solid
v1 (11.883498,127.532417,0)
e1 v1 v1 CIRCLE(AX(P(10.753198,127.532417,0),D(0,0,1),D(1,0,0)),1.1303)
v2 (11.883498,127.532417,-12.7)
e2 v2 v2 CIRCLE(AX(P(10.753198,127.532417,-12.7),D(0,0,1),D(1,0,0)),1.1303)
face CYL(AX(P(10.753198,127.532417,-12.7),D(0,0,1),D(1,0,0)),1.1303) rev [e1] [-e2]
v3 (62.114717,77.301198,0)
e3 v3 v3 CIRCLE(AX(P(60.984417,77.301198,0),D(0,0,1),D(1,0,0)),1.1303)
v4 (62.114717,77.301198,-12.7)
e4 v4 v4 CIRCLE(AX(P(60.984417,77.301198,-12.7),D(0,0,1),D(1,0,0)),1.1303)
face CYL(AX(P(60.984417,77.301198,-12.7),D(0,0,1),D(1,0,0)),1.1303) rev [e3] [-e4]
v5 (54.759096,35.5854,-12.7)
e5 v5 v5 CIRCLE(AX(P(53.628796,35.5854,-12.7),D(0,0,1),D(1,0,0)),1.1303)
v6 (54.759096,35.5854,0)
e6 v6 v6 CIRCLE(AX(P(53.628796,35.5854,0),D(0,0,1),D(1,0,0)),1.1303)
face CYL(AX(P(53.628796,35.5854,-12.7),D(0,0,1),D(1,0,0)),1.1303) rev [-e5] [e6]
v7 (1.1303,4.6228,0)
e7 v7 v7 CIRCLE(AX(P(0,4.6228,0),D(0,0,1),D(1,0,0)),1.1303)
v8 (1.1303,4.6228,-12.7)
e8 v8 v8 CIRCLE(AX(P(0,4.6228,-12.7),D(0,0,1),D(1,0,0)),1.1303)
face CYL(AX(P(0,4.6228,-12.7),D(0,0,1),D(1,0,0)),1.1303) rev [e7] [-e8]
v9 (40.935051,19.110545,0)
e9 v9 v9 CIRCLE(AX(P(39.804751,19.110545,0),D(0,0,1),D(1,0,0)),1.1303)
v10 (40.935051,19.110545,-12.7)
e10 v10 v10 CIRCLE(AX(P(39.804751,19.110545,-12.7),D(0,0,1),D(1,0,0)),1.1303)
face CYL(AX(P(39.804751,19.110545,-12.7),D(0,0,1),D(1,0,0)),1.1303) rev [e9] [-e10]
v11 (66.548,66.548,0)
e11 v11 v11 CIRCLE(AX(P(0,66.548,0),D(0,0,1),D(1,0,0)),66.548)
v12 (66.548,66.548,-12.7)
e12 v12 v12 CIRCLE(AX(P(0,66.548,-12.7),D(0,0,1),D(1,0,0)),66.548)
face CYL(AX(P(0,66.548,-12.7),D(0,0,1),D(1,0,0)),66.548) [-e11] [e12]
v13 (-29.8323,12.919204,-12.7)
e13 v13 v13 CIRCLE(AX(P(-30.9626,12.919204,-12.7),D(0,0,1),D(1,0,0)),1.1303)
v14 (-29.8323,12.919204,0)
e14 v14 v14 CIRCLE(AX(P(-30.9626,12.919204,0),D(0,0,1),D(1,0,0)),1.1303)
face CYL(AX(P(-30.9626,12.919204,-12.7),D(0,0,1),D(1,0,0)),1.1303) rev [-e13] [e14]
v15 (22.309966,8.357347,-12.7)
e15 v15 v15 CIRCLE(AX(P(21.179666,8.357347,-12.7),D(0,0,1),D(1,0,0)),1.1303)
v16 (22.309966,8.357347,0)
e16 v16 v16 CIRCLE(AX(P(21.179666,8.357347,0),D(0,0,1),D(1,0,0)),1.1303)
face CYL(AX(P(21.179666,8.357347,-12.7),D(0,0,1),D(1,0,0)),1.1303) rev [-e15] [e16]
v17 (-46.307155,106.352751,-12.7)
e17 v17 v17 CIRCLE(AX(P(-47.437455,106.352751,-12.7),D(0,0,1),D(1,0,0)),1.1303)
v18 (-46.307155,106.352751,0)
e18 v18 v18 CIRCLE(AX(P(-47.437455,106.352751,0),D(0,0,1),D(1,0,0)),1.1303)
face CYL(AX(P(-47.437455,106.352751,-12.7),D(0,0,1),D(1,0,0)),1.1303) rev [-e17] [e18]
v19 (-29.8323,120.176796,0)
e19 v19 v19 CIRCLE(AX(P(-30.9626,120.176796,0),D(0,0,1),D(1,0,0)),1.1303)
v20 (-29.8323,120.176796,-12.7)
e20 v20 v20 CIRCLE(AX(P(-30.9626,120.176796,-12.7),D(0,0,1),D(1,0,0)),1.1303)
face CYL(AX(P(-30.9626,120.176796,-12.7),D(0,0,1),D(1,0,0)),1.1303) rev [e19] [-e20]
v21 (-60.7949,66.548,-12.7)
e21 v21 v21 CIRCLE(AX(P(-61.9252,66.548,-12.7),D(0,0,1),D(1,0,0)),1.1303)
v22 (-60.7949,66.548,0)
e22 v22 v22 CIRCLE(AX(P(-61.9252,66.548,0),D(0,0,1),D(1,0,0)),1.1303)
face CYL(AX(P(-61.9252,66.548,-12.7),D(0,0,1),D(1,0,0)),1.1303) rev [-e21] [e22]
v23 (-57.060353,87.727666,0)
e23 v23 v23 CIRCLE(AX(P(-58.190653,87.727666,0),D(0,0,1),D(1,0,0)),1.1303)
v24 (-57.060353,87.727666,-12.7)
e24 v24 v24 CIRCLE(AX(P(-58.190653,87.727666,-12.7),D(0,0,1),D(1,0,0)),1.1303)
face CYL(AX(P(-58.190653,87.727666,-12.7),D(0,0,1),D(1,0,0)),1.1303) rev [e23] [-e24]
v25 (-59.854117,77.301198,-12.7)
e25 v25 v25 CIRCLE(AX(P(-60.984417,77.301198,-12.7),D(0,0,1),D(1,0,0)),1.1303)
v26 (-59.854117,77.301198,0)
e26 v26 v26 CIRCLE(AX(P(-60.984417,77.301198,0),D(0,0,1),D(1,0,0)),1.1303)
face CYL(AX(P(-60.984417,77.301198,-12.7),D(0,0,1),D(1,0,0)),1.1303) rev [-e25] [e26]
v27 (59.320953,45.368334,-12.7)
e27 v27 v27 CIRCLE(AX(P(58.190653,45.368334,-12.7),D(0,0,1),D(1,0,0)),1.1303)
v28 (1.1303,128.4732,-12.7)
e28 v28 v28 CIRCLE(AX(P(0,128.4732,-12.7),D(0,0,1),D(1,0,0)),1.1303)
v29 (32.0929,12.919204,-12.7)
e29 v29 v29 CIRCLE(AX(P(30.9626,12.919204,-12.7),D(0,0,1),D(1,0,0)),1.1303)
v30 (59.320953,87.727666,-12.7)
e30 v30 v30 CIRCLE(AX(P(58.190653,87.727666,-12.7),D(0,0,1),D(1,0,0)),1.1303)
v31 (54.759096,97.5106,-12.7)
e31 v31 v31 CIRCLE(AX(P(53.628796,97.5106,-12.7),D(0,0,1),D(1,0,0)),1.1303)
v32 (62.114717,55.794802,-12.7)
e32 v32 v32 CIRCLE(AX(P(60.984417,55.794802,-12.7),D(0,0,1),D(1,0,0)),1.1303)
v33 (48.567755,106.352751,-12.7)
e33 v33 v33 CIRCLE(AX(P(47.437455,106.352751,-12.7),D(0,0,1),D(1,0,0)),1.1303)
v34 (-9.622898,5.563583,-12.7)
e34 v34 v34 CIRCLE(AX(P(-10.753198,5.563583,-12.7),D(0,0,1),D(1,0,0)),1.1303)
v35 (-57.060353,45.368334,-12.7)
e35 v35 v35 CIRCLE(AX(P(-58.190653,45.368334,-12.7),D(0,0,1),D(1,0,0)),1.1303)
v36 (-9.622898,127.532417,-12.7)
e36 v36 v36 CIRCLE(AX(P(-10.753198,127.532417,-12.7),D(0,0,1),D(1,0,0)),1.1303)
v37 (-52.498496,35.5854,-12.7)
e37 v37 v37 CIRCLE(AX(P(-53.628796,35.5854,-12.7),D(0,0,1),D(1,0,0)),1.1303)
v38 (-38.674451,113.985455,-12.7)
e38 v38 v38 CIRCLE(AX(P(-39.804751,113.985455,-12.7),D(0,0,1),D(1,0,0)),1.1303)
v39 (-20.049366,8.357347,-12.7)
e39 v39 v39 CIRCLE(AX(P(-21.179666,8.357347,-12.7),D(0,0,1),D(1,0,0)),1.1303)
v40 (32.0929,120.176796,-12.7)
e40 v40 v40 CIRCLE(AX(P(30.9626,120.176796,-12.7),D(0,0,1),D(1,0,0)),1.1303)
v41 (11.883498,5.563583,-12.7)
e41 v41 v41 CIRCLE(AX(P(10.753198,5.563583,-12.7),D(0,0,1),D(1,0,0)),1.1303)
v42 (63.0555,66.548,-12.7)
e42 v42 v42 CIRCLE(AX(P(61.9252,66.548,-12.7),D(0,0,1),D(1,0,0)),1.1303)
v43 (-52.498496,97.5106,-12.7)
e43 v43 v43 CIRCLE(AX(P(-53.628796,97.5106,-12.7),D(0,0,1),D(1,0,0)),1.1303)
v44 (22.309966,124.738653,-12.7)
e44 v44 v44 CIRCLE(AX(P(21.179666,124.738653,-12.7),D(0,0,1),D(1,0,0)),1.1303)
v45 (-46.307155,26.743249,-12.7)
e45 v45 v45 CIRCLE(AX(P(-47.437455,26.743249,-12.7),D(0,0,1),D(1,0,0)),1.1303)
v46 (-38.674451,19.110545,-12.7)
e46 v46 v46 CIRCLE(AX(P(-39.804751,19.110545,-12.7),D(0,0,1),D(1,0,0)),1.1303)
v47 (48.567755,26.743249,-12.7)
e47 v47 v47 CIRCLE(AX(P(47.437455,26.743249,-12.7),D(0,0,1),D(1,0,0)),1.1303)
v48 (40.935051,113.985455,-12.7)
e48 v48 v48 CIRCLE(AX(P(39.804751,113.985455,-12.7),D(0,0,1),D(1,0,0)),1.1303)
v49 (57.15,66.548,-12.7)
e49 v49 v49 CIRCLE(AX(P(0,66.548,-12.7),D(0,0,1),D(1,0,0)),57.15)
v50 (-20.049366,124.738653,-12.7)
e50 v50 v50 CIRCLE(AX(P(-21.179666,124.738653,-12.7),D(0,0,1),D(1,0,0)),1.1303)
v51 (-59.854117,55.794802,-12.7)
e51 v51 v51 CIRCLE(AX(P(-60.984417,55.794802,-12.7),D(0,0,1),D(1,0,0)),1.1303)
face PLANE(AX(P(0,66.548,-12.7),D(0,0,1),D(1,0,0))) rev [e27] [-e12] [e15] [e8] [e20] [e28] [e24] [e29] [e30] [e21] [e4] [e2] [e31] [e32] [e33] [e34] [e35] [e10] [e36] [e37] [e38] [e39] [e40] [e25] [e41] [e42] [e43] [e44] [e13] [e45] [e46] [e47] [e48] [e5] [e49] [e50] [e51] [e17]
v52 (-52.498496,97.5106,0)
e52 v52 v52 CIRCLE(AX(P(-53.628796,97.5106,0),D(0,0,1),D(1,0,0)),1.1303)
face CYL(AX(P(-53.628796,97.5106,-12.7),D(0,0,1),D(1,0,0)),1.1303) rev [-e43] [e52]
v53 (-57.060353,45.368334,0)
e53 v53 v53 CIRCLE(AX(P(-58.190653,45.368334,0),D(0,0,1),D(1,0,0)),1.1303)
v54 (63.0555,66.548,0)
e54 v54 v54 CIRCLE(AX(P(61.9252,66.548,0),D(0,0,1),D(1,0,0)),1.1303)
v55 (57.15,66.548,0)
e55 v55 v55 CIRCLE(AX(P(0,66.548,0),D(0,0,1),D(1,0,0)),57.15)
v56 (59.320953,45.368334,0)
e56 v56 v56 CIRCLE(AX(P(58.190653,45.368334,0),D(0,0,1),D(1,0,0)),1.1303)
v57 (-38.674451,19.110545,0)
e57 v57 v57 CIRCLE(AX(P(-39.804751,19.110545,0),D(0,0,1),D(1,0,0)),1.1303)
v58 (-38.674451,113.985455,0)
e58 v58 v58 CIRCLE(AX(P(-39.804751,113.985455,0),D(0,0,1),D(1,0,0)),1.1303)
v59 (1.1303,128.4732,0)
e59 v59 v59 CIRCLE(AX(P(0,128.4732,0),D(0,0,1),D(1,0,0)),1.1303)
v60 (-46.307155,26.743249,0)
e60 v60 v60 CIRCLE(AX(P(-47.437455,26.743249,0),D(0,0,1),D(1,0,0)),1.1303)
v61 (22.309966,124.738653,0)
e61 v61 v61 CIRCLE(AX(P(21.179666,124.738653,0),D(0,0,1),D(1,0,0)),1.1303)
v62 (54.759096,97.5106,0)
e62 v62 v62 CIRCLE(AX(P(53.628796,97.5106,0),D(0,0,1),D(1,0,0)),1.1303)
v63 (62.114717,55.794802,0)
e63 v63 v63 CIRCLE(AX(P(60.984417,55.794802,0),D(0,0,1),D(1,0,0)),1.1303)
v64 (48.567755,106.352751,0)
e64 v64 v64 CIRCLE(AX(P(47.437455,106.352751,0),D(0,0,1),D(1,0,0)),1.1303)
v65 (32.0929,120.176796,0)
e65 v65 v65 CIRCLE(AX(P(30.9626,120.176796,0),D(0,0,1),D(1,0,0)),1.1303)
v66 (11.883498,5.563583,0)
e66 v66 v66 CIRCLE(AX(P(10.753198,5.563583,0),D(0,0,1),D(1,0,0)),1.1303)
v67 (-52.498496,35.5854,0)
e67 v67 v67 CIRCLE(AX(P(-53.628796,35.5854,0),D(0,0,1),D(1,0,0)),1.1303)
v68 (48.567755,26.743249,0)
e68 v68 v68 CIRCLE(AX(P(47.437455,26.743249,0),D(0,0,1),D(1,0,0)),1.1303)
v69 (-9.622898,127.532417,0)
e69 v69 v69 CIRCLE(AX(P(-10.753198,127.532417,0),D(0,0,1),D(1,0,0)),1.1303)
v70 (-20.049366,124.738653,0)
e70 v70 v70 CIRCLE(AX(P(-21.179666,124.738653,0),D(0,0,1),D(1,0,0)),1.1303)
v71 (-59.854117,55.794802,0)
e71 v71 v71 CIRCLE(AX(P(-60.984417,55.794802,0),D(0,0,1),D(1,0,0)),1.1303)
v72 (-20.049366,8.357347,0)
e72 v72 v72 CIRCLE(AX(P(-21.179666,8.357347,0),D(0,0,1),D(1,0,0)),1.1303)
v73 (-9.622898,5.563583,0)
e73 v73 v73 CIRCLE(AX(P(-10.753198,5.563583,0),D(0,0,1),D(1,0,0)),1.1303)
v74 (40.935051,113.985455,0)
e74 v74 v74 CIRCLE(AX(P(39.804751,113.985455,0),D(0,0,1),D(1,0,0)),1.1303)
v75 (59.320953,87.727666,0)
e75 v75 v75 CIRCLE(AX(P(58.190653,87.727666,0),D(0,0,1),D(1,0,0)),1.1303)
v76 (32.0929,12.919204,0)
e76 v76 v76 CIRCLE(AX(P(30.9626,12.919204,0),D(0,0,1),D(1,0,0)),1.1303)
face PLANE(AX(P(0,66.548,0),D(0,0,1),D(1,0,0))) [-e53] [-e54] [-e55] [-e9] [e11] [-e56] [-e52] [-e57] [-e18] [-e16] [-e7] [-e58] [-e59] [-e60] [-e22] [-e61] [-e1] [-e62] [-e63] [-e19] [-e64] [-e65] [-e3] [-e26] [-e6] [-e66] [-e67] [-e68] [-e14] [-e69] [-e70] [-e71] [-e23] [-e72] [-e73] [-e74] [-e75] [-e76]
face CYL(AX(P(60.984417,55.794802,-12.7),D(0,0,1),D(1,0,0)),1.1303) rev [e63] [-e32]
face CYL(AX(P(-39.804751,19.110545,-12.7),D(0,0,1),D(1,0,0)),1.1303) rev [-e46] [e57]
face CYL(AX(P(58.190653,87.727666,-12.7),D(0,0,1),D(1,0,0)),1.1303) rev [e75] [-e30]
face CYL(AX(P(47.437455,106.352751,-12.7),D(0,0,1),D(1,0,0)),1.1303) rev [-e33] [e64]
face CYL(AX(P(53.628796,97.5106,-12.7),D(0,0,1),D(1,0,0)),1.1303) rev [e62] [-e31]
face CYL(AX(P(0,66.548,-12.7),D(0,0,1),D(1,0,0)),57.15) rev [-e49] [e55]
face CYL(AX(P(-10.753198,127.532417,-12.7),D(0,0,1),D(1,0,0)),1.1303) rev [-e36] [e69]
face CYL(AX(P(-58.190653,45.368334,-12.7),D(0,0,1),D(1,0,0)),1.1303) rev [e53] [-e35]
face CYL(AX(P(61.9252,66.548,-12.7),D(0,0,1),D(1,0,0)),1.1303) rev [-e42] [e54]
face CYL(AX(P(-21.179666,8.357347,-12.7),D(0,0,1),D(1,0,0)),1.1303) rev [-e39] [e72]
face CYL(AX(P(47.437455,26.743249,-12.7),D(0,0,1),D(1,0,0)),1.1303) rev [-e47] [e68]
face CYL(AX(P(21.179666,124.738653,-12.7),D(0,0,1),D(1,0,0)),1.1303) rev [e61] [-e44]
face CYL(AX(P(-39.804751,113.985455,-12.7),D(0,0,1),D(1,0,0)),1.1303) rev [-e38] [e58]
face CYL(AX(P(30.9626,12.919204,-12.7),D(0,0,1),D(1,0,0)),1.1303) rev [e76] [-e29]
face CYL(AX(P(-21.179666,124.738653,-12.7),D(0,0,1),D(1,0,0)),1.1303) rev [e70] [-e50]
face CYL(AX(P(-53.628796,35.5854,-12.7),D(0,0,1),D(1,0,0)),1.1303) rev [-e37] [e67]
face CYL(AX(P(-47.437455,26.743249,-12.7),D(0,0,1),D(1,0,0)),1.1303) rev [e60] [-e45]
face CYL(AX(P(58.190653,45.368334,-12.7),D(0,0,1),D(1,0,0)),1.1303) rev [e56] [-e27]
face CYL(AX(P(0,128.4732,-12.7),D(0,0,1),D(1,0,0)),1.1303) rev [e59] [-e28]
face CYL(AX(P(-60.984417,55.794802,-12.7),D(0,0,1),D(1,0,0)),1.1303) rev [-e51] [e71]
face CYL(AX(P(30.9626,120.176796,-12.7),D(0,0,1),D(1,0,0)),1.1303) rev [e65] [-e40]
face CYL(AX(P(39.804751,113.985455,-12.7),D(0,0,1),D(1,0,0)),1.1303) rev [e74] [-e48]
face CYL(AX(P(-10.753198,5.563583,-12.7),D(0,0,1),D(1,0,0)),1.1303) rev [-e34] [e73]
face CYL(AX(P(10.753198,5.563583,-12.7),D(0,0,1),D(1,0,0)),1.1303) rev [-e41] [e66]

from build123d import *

# Parameters (mm, degrees)
SKETCH1_R                   = 66.548
SKETCH1_R_2                 = 57.15
SKETCH1_R_3                 = 1.1303
BOSS_EXTRUDE1_DEPTH         = 12.7
BODY_MOVE_COPY1_START       = -12.7
BODY_MOVE_COPY1_OUTLINE_R   = 1.1303
BODY_MOVE_COPY1_DEPTH       = 12.7
BODY_MOVE_COPY1_2_OUTLINE_R = 1.1303
BODY_MOVE_COPY1_2_DEPTH     = 12.7


# Read off the part's stored shape, not the designer's step: Body-Move/Copy1
with BuildPart() as part:
    # Sketch1 → Boss-Extrude1 (new body)
    with BuildSketch(Plane.XY):
        Circle(SKETCH1_R)
        Circle(SKETCH1_R_2, mode=Mode.SUBTRACT)
        with Locations((0, 61.9252)):
            Circle(SKETCH1_R_3, mode=Mode.SUBTRACT)
        with Locations((10.753198132, 60.984417067)):
            Circle(SKETCH1_R_3, mode=Mode.SUBTRACT)
        with Locations((21.179665779, 58.190653481)):
            Circle(SKETCH1_R_3, mode=Mode.SUBTRACT)
        with Locations((30.9626, 53.628796334)):
            Circle(SKETCH1_R_3, mode=Mode.SUBTRACT)
        with Locations((39.804751287, 47.437455349)):
            Circle(SKETCH1_R_3, mode=Mode.SUBTRACT)
        with Locations((47.437455349, 39.804751287)):
            Circle(SKETCH1_R_3, mode=Mode.SUBTRACT)
        with Locations((53.628796334, 30.9626)):
            Circle(SKETCH1_R_3, mode=Mode.SUBTRACT)
        with Locations((58.190653481, 21.179665779)):
            Circle(SKETCH1_R_3, mode=Mode.SUBTRACT)
        with Locations((60.984417067, 10.753198132)):
            Circle(SKETCH1_R_3, mode=Mode.SUBTRACT)
        with Locations((61.9252, 0)):
            Circle(SKETCH1_R_3, mode=Mode.SUBTRACT)
        with Locations((60.984417067, -10.753198132)):
            Circle(SKETCH1_R_3, mode=Mode.SUBTRACT)
        with Locations((58.190653481, -21.179665779)):
            Circle(SKETCH1_R_3, mode=Mode.SUBTRACT)
        with Locations((53.628796334, -30.9626)):
            Circle(SKETCH1_R_3, mode=Mode.SUBTRACT)
        with Locations((47.437455349, -39.804751287)):
            Circle(SKETCH1_R_3, mode=Mode.SUBTRACT)
        with Locations((39.804751287, -47.437455349)):
            Circle(SKETCH1_R_3, mode=Mode.SUBTRACT)
        with Locations((30.9626, -53.628796334)):
            Circle(SKETCH1_R_3, mode=Mode.SUBTRACT)
        with Locations((21.179665779, -58.190653481)):
            Circle(SKETCH1_R_3, mode=Mode.SUBTRACT)
        with Locations((10.753198132, -60.984417067)):
            Circle(SKETCH1_R_3, mode=Mode.SUBTRACT)
        with Locations((0, -61.9252)):
            Circle(SKETCH1_R_3, mode=Mode.SUBTRACT)
        with Locations((-10.753198132, -60.984417067)):
            Circle(SKETCH1_R_3, mode=Mode.SUBTRACT)
        with Locations((-21.179665779, -58.190653481)):
            Circle(SKETCH1_R_3, mode=Mode.SUBTRACT)
        with Locations((-30.9626, -53.628796334)):
            Circle(SKETCH1_R_3, mode=Mode.SUBTRACT)
        with Locations((-39.804751287, -47.437455349)):
            Circle(SKETCH1_R_3, mode=Mode.SUBTRACT)
        with Locations((-47.437455349, -39.804751287)):
            Circle(SKETCH1_R_3, mode=Mode.SUBTRACT)
        with Locations((-53.628796334, -30.9626)):
            Circle(SKETCH1_R_3, mode=Mode.SUBTRACT)
        with Locations((-58.190653481, -21.179665779)):
            Circle(SKETCH1_R_3, mode=Mode.SUBTRACT)
        with Locations((-60.984417067, -10.753198132)):
            Circle(SKETCH1_R_3, mode=Mode.SUBTRACT)
        with Locations((-61.9252, 0)):
            Circle(SKETCH1_R_3, mode=Mode.SUBTRACT)
        with Locations((-60.984417067, 10.753198132)):
            Circle(SKETCH1_R_3, mode=Mode.SUBTRACT)
        with Locations((-58.190653481, 21.179665779)):
            Circle(SKETCH1_R_3, mode=Mode.SUBTRACT)
        with Locations((-53.628796334, 30.9626)):
            Circle(SKETCH1_R_3, mode=Mode.SUBTRACT)
        with Locations((-47.437455349, 39.804751287)):
            Circle(SKETCH1_R_3, mode=Mode.SUBTRACT)
        with Locations((-39.804751287, 47.437455349)):
            Circle(SKETCH1_R_3, mode=Mode.SUBTRACT)
        with Locations((-30.9626, 53.628796334)):
            Circle(SKETCH1_R_3, mode=Mode.SUBTRACT)
        with Locations((-21.179665779, 58.190653481)):
            Circle(SKETCH1_R_3, mode=Mode.SUBTRACT)
        with Locations((-10.753198132, 60.984417067)):
            Circle(SKETCH1_R_3, mode=Mode.SUBTRACT)
    extrude(amount=-BOSS_EXTRUDE1_DEPTH)

    # Body-Move/Copy1 outline → Body-Move/Copy1 (cut)
    # profile 1 of 4: a face of its own
    with BuildSketch(Plane.XY.offset(BODY_MOVE_COPY1_START)):
        with BuildLine():
            ThreePointArc((-51.613279002, 24.539599237), (-54.79707391, 28.786683882), (-57.632258571, 33.274))
            ThreePointArc((-57.632258571, 33.274), (0, -66.548), (57.632258571, 33.274))
            ThreePointArc((57.632258571, 33.274), (54.79707391, 28.786683882), (51.613279002, 24.539599237))
            ThreePointArc((51.613279002, 24.539599237), (0, -57.15), (-51.613279002, 24.539599237))
        make_face()
        with Locations((-39.804751287, -47.437455349)):
            Circle(BODY_MOVE_COPY1_OUTLINE_R, mode=Mode.SUBTRACT)
        with Locations((-53.628796334, -30.9626)):
            Circle(BODY_MOVE_COPY1_OUTLINE_R, mode=Mode.SUBTRACT)
        with Locations((-58.190653481, -21.179665779)):
            Circle(BODY_MOVE_COPY1_OUTLINE_R, mode=Mode.SUBTRACT)
        with Locations((-47.437455349, -39.804751287)):
            Circle(BODY_MOVE_COPY1_OUTLINE_R, mode=Mode.SUBTRACT)
        with Locations((-21.179665779, -58.190653481)):
            Circle(BODY_MOVE_COPY1_OUTLINE_R, mode=Mode.SUBTRACT)
        with Locations((-30.9626, -53.628796334)):
            Circle(BODY_MOVE_COPY1_OUTLINE_R, mode=Mode.SUBTRACT)
        with Locations((-10.753198132, -60.984417067)):
            Circle(BODY_MOVE_COPY1_OUTLINE_R, mode=Mode.SUBTRACT)
        with Locations((-60.984417067, -10.753198132)):
            Circle(BODY_MOVE_COPY1_OUTLINE_R, mode=Mode.SUBTRACT)
        with Locations((-61.9252, 0)):
            Circle(BODY_MOVE_COPY1_OUTLINE_R, mode=Mode.SUBTRACT)
        with Locations((-60.984417067, 10.753198132)):
            Circle(BODY_MOVE_COPY1_OUTLINE_R, mode=Mode.SUBTRACT)
        with Locations((-58.190653481, 21.179665779)):
            Circle(BODY_MOVE_COPY1_OUTLINE_R, mode=Mode.SUBTRACT)
        with Locations((0, -61.9252)):
            Circle(BODY_MOVE_COPY1_OUTLINE_R, mode=Mode.SUBTRACT)
        with Locations((10.753198132, -60.984417067)):
            Circle(BODY_MOVE_COPY1_OUTLINE_R, mode=Mode.SUBTRACT)
        with Locations((21.179665779, -58.190653481)):
            Circle(BODY_MOVE_COPY1_OUTLINE_R, mode=Mode.SUBTRACT)
        with Locations((30.9626, -53.628796334)):
            Circle(BODY_MOVE_COPY1_OUTLINE_R, mode=Mode.SUBTRACT)
        with Locations((39.804751287, -47.437455349)):
            Circle(BODY_MOVE_COPY1_OUTLINE_R, mode=Mode.SUBTRACT)
        with Locations((47.437455349, -39.804751287)):
            Circle(BODY_MOVE_COPY1_OUTLINE_R, mode=Mode.SUBTRACT)
        with Locations((53.628796334, -30.9626)):
            Circle(BODY_MOVE_COPY1_OUTLINE_R, mode=Mode.SUBTRACT)
        with Locations((58.190653481, -21.179665779)):
            Circle(BODY_MOVE_COPY1_OUTLINE_R, mode=Mode.SUBTRACT)
        with Locations((60.984417067, -10.753198132)):
            Circle(BODY_MOVE_COPY1_OUTLINE_R, mode=Mode.SUBTRACT)
        with Locations((61.9252, 0)):
            Circle(BODY_MOVE_COPY1_OUTLINE_R, mode=Mode.SUBTRACT)
        with Locations((60.984417067, 10.753198132)):
            Circle(BODY_MOVE_COPY1_OUTLINE_R, mode=Mode.SUBTRACT)
        with Locations((58.190653481, 21.179665779)):
            Circle(BODY_MOVE_COPY1_OUTLINE_R, mode=Mode.SUBTRACT)
    # profile 2 of 4: a face of its own
    with BuildSketch(Plane.XY.offset(BODY_MOVE_COPY1_START)):
        with BuildLine():
            ThreePointArc((51.613279002, 42.008400763), (0, 66.548), (-51.613279002, 42.008400763))
            ThreePointArc((-51.613279002, 42.008400763), (-49.23304107, 37.526797975), (-46.464647034, 33.274))
            ThreePointArc((-46.464647034, 33.274), (0, 57.15), (46.464647034, 33.274))
            ThreePointArc((46.464647034, 33.274), (49.23304107, 37.526797975), (51.613279002, 42.008400763))
        make_face()
        with Locations((-47.437455349, 39.804751287)):
            Circle(BODY_MOVE_COPY1_OUTLINE_R, mode=Mode.SUBTRACT)
        with Locations((-39.804751287, 47.437455349)):
            Circle(BODY_MOVE_COPY1_OUTLINE_R, mode=Mode.SUBTRACT)
        with Locations((-30.9626, 53.628796334)):
            Circle(BODY_MOVE_COPY1_OUTLINE_R, mode=Mode.SUBTRACT)
        with Locations((-21.179665779, 58.190653481)):
            Circle(BODY_MOVE_COPY1_OUTLINE_R, mode=Mode.SUBTRACT)
        with Locations((-10.753198132, 60.984417067)):
            Circle(BODY_MOVE_COPY1_OUTLINE_R, mode=Mode.SUBTRACT)
        with Locations((21.179665779, 58.190653481)):
            Circle(BODY_MOVE_COPY1_OUTLINE_R, mode=Mode.SUBTRACT)
        with Locations((30.9626, 53.628796334)):
            Circle(BODY_MOVE_COPY1_OUTLINE_R, mode=Mode.SUBTRACT)
        with Locations((0, 61.9252)):
            Circle(BODY_MOVE_COPY1_OUTLINE_R, mode=Mode.SUBTRACT)
        with Locations((10.753198132, 60.984417067)):
            Circle(BODY_MOVE_COPY1_OUTLINE_R, mode=Mode.SUBTRACT)
        with Locations((47.437455349, 39.804751287)):
            Circle(BODY_MOVE_COPY1_OUTLINE_R, mode=Mode.SUBTRACT)
        with Locations((39.804751287, 47.437455349)):
            Circle(BODY_MOVE_COPY1_OUTLINE_R, mode=Mode.SUBTRACT)
    # profile 3 of 4: a face of its own
    with BuildSketch(Plane.XY.offset(BODY_MOVE_COPY1_START)):
        with Locations((53.628796334, 35.5854)):
            Circle(BODY_MOVE_COPY1_OUTLINE_R)
    # profile 4 of 4: a face of its own
    with BuildSketch(Plane.XY.offset(BODY_MOVE_COPY1_START)):
        with Locations((-53.628796334, 35.5854)):
            Circle(BODY_MOVE_COPY1_OUTLINE_R)
    extrude(amount=BODY_MOVE_COPY1_DEPTH, mode=Mode.SUBTRACT)

    # Body-Move_Copy1 2 outline → Body-Move_Copy1 2 (add)
    # profile 1 of 4: a face of its own
    with BuildSketch(Plane.XY.offset(BODY_MOVE_COPY1_START)):
        with BuildLine():
            ThreePointArc((57.632258571, 33.274), (0, 133.096), (-57.632258571, 33.274))
            ThreePointArc((-57.632258571, 33.274), (-54.79707391, 37.761316118), (-51.613279002, 42.008400763))
            ThreePointArc((-51.613279002, 42.008400763), (0, 123.698), (51.613279002, 42.008400763))
            ThreePointArc((51.613279002, 42.008400763), (54.79707391, 37.761316118), (57.632258571, 33.274))
        make_face()
        with Locations((-58.190653481, 45.368334221)):
            Circle(BODY_MOVE_COPY1_2_OUTLINE_R, mode=Mode.SUBTRACT)
        with Locations((-60.984417067, 55.794801868)):
            Circle(BODY_MOVE_COPY1_2_OUTLINE_R, mode=Mode.SUBTRACT)
        with Locations((-61.9252, 66.548)):
            Circle(BODY_MOVE_COPY1_2_OUTLINE_R, mode=Mode.SUBTRACT)
        with Locations((-60.984417067, 77.301198132)):
            Circle(BODY_MOVE_COPY1_2_OUTLINE_R, mode=Mode.SUBTRACT)
        with Locations((-58.190653481, 87.727665779)):
            Circle(BODY_MOVE_COPY1_2_OUTLINE_R, mode=Mode.SUBTRACT)
        with Locations((-53.628796334, 97.5106)):
            Circle(BODY_MOVE_COPY1_2_OUTLINE_R, mode=Mode.SUBTRACT)
        with Locations((-47.437455349, 106.352751287)):
            Circle(BODY_MOVE_COPY1_2_OUTLINE_R, mode=Mode.SUBTRACT)
        with Locations((-39.804751287, 113.985455349)):
            Circle(BODY_MOVE_COPY1_2_OUTLINE_R, mode=Mode.SUBTRACT)
        with Locations((-30.9626, 120.176796334)):
            Circle(BODY_MOVE_COPY1_2_OUTLINE_R, mode=Mode.SUBTRACT)
        with Locations((-21.179665779, 124.738653481)):
            Circle(BODY_MOVE_COPY1_2_OUTLINE_R, mode=Mode.SUBTRACT)
        with Locations((-10.753198132, 127.532417067)):
            Circle(BODY_MOVE_COPY1_2_OUTLINE_R, mode=Mode.SUBTRACT)
        with Locations((58.190653481, 45.368334221)):
            Circle(BODY_MOVE_COPY1_2_OUTLINE_R, mode=Mode.SUBTRACT)
        with Locations((60.984417067, 55.794801868)):
            Circle(BODY_MOVE_COPY1_2_OUTLINE_R, mode=Mode.SUBTRACT)
        with Locations((61.9252, 66.548)):
            Circle(BODY_MOVE_COPY1_2_OUTLINE_R, mode=Mode.SUBTRACT)
        with Locations((60.984417067, 77.301198132)):
            Circle(BODY_MOVE_COPY1_2_OUTLINE_R, mode=Mode.SUBTRACT)
        with Locations((0, 128.4732)):
            Circle(BODY_MOVE_COPY1_2_OUTLINE_R, mode=Mode.SUBTRACT)
        with Locations((10.753198132, 127.532417067)):
            Circle(BODY_MOVE_COPY1_2_OUTLINE_R, mode=Mode.SUBTRACT)
        with Locations((30.9626, 120.176796334)):
            Circle(BODY_MOVE_COPY1_2_OUTLINE_R, mode=Mode.SUBTRACT)
        with Locations((21.179665779, 124.738653481)):
            Circle(BODY_MOVE_COPY1_2_OUTLINE_R, mode=Mode.SUBTRACT)
        with Locations((47.437455349, 106.352751287)):
            Circle(BODY_MOVE_COPY1_2_OUTLINE_R, mode=Mode.SUBTRACT)
        with Locations((58.190653481, 87.727665779)):
            Circle(BODY_MOVE_COPY1_2_OUTLINE_R, mode=Mode.SUBTRACT)
        with Locations((53.628796334, 97.5106)):
            Circle(BODY_MOVE_COPY1_2_OUTLINE_R, mode=Mode.SUBTRACT)
        with Locations((39.804751287, 113.985455349)):
            Circle(BODY_MOVE_COPY1_2_OUTLINE_R, mode=Mode.SUBTRACT)
    # profile 2 of 4: a face of its own
    with BuildSketch(Plane.XY.offset(BODY_MOVE_COPY1_START)):
        with BuildLine():
            ThreePointArc((-46.464647034, 33.274), (-49.23304107, 29.021202025), (-51.613279002, 24.539599237))
            ThreePointArc((-51.613279002, 24.539599237), (0, 0), (51.613279002, 24.539599237))
            ThreePointArc((51.613279002, 24.539599237), (49.23304107, 29.021202025), (46.464647034, 33.274))
            ThreePointArc((46.464647034, 33.274), (0, 9.398), (-46.464647034, 33.274))
        make_face()
        with Locations((-39.804751287, 19.110544651)):
            Circle(BODY_MOVE_COPY1_2_OUTLINE_R, mode=Mode.SUBTRACT)
        with Locations((-47.437455349, 26.743248713)):
            Circle(BODY_MOVE_COPY1_2_OUTLINE_R, mode=Mode.SUBTRACT)
        with Locations((-10.753198132, 5.563582933)):
            Circle(BODY_MOVE_COPY1_2_OUTLINE_R, mode=Mode.SUBTRACT)
        with Locations((-30.9626, 12.919203666)):
            Circle(BODY_MOVE_COPY1_2_OUTLINE_R, mode=Mode.SUBTRACT)
        with Locations((-21.179665779, 8.357346519)):
            Circle(BODY_MOVE_COPY1_2_OUTLINE_R, mode=Mode.SUBTRACT)
        with Locations((0, 4.6228)):
            Circle(BODY_MOVE_COPY1_2_OUTLINE_R, mode=Mode.SUBTRACT)
        with Locations((10.753198132, 5.563582933)):
            Circle(BODY_MOVE_COPY1_2_OUTLINE_R, mode=Mode.SUBTRACT)
        with Locations((21.179665779, 8.357346519)):
            Circle(BODY_MOVE_COPY1_2_OUTLINE_R, mode=Mode.SUBTRACT)
        with Locations((30.9626, 12.919203666)):
            Circle(BODY_MOVE_COPY1_2_OUTLINE_R, mode=Mode.SUBTRACT)
        with Locations((39.804751287, 19.110544651)):
            Circle(BODY_MOVE_COPY1_2_OUTLINE_R, mode=Mode.SUBTRACT)
        with Locations((47.437455349, 26.743248713)):
            Circle(BODY_MOVE_COPY1_2_OUTLINE_R, mode=Mode.SUBTRACT)
    # profile 3 of 4: a face of its own
    with BuildSketch(Plane.XY.offset(BODY_MOVE_COPY1_START)):
        with Locations((53.628796334, 30.9626)):
            Circle(BODY_MOVE_COPY1_2_OUTLINE_R)
    # profile 4 of 4: a face of its own
    with BuildSketch(Plane.XY.offset(BODY_MOVE_COPY1_START)):
        with Locations((-53.628796334, 30.9626)):
            Circle(BODY_MOVE_COPY1_2_OUTLINE_R)
    extrude(amount=BODY_MOVE_COPY1_2_DEPTH)


solid = part.part
